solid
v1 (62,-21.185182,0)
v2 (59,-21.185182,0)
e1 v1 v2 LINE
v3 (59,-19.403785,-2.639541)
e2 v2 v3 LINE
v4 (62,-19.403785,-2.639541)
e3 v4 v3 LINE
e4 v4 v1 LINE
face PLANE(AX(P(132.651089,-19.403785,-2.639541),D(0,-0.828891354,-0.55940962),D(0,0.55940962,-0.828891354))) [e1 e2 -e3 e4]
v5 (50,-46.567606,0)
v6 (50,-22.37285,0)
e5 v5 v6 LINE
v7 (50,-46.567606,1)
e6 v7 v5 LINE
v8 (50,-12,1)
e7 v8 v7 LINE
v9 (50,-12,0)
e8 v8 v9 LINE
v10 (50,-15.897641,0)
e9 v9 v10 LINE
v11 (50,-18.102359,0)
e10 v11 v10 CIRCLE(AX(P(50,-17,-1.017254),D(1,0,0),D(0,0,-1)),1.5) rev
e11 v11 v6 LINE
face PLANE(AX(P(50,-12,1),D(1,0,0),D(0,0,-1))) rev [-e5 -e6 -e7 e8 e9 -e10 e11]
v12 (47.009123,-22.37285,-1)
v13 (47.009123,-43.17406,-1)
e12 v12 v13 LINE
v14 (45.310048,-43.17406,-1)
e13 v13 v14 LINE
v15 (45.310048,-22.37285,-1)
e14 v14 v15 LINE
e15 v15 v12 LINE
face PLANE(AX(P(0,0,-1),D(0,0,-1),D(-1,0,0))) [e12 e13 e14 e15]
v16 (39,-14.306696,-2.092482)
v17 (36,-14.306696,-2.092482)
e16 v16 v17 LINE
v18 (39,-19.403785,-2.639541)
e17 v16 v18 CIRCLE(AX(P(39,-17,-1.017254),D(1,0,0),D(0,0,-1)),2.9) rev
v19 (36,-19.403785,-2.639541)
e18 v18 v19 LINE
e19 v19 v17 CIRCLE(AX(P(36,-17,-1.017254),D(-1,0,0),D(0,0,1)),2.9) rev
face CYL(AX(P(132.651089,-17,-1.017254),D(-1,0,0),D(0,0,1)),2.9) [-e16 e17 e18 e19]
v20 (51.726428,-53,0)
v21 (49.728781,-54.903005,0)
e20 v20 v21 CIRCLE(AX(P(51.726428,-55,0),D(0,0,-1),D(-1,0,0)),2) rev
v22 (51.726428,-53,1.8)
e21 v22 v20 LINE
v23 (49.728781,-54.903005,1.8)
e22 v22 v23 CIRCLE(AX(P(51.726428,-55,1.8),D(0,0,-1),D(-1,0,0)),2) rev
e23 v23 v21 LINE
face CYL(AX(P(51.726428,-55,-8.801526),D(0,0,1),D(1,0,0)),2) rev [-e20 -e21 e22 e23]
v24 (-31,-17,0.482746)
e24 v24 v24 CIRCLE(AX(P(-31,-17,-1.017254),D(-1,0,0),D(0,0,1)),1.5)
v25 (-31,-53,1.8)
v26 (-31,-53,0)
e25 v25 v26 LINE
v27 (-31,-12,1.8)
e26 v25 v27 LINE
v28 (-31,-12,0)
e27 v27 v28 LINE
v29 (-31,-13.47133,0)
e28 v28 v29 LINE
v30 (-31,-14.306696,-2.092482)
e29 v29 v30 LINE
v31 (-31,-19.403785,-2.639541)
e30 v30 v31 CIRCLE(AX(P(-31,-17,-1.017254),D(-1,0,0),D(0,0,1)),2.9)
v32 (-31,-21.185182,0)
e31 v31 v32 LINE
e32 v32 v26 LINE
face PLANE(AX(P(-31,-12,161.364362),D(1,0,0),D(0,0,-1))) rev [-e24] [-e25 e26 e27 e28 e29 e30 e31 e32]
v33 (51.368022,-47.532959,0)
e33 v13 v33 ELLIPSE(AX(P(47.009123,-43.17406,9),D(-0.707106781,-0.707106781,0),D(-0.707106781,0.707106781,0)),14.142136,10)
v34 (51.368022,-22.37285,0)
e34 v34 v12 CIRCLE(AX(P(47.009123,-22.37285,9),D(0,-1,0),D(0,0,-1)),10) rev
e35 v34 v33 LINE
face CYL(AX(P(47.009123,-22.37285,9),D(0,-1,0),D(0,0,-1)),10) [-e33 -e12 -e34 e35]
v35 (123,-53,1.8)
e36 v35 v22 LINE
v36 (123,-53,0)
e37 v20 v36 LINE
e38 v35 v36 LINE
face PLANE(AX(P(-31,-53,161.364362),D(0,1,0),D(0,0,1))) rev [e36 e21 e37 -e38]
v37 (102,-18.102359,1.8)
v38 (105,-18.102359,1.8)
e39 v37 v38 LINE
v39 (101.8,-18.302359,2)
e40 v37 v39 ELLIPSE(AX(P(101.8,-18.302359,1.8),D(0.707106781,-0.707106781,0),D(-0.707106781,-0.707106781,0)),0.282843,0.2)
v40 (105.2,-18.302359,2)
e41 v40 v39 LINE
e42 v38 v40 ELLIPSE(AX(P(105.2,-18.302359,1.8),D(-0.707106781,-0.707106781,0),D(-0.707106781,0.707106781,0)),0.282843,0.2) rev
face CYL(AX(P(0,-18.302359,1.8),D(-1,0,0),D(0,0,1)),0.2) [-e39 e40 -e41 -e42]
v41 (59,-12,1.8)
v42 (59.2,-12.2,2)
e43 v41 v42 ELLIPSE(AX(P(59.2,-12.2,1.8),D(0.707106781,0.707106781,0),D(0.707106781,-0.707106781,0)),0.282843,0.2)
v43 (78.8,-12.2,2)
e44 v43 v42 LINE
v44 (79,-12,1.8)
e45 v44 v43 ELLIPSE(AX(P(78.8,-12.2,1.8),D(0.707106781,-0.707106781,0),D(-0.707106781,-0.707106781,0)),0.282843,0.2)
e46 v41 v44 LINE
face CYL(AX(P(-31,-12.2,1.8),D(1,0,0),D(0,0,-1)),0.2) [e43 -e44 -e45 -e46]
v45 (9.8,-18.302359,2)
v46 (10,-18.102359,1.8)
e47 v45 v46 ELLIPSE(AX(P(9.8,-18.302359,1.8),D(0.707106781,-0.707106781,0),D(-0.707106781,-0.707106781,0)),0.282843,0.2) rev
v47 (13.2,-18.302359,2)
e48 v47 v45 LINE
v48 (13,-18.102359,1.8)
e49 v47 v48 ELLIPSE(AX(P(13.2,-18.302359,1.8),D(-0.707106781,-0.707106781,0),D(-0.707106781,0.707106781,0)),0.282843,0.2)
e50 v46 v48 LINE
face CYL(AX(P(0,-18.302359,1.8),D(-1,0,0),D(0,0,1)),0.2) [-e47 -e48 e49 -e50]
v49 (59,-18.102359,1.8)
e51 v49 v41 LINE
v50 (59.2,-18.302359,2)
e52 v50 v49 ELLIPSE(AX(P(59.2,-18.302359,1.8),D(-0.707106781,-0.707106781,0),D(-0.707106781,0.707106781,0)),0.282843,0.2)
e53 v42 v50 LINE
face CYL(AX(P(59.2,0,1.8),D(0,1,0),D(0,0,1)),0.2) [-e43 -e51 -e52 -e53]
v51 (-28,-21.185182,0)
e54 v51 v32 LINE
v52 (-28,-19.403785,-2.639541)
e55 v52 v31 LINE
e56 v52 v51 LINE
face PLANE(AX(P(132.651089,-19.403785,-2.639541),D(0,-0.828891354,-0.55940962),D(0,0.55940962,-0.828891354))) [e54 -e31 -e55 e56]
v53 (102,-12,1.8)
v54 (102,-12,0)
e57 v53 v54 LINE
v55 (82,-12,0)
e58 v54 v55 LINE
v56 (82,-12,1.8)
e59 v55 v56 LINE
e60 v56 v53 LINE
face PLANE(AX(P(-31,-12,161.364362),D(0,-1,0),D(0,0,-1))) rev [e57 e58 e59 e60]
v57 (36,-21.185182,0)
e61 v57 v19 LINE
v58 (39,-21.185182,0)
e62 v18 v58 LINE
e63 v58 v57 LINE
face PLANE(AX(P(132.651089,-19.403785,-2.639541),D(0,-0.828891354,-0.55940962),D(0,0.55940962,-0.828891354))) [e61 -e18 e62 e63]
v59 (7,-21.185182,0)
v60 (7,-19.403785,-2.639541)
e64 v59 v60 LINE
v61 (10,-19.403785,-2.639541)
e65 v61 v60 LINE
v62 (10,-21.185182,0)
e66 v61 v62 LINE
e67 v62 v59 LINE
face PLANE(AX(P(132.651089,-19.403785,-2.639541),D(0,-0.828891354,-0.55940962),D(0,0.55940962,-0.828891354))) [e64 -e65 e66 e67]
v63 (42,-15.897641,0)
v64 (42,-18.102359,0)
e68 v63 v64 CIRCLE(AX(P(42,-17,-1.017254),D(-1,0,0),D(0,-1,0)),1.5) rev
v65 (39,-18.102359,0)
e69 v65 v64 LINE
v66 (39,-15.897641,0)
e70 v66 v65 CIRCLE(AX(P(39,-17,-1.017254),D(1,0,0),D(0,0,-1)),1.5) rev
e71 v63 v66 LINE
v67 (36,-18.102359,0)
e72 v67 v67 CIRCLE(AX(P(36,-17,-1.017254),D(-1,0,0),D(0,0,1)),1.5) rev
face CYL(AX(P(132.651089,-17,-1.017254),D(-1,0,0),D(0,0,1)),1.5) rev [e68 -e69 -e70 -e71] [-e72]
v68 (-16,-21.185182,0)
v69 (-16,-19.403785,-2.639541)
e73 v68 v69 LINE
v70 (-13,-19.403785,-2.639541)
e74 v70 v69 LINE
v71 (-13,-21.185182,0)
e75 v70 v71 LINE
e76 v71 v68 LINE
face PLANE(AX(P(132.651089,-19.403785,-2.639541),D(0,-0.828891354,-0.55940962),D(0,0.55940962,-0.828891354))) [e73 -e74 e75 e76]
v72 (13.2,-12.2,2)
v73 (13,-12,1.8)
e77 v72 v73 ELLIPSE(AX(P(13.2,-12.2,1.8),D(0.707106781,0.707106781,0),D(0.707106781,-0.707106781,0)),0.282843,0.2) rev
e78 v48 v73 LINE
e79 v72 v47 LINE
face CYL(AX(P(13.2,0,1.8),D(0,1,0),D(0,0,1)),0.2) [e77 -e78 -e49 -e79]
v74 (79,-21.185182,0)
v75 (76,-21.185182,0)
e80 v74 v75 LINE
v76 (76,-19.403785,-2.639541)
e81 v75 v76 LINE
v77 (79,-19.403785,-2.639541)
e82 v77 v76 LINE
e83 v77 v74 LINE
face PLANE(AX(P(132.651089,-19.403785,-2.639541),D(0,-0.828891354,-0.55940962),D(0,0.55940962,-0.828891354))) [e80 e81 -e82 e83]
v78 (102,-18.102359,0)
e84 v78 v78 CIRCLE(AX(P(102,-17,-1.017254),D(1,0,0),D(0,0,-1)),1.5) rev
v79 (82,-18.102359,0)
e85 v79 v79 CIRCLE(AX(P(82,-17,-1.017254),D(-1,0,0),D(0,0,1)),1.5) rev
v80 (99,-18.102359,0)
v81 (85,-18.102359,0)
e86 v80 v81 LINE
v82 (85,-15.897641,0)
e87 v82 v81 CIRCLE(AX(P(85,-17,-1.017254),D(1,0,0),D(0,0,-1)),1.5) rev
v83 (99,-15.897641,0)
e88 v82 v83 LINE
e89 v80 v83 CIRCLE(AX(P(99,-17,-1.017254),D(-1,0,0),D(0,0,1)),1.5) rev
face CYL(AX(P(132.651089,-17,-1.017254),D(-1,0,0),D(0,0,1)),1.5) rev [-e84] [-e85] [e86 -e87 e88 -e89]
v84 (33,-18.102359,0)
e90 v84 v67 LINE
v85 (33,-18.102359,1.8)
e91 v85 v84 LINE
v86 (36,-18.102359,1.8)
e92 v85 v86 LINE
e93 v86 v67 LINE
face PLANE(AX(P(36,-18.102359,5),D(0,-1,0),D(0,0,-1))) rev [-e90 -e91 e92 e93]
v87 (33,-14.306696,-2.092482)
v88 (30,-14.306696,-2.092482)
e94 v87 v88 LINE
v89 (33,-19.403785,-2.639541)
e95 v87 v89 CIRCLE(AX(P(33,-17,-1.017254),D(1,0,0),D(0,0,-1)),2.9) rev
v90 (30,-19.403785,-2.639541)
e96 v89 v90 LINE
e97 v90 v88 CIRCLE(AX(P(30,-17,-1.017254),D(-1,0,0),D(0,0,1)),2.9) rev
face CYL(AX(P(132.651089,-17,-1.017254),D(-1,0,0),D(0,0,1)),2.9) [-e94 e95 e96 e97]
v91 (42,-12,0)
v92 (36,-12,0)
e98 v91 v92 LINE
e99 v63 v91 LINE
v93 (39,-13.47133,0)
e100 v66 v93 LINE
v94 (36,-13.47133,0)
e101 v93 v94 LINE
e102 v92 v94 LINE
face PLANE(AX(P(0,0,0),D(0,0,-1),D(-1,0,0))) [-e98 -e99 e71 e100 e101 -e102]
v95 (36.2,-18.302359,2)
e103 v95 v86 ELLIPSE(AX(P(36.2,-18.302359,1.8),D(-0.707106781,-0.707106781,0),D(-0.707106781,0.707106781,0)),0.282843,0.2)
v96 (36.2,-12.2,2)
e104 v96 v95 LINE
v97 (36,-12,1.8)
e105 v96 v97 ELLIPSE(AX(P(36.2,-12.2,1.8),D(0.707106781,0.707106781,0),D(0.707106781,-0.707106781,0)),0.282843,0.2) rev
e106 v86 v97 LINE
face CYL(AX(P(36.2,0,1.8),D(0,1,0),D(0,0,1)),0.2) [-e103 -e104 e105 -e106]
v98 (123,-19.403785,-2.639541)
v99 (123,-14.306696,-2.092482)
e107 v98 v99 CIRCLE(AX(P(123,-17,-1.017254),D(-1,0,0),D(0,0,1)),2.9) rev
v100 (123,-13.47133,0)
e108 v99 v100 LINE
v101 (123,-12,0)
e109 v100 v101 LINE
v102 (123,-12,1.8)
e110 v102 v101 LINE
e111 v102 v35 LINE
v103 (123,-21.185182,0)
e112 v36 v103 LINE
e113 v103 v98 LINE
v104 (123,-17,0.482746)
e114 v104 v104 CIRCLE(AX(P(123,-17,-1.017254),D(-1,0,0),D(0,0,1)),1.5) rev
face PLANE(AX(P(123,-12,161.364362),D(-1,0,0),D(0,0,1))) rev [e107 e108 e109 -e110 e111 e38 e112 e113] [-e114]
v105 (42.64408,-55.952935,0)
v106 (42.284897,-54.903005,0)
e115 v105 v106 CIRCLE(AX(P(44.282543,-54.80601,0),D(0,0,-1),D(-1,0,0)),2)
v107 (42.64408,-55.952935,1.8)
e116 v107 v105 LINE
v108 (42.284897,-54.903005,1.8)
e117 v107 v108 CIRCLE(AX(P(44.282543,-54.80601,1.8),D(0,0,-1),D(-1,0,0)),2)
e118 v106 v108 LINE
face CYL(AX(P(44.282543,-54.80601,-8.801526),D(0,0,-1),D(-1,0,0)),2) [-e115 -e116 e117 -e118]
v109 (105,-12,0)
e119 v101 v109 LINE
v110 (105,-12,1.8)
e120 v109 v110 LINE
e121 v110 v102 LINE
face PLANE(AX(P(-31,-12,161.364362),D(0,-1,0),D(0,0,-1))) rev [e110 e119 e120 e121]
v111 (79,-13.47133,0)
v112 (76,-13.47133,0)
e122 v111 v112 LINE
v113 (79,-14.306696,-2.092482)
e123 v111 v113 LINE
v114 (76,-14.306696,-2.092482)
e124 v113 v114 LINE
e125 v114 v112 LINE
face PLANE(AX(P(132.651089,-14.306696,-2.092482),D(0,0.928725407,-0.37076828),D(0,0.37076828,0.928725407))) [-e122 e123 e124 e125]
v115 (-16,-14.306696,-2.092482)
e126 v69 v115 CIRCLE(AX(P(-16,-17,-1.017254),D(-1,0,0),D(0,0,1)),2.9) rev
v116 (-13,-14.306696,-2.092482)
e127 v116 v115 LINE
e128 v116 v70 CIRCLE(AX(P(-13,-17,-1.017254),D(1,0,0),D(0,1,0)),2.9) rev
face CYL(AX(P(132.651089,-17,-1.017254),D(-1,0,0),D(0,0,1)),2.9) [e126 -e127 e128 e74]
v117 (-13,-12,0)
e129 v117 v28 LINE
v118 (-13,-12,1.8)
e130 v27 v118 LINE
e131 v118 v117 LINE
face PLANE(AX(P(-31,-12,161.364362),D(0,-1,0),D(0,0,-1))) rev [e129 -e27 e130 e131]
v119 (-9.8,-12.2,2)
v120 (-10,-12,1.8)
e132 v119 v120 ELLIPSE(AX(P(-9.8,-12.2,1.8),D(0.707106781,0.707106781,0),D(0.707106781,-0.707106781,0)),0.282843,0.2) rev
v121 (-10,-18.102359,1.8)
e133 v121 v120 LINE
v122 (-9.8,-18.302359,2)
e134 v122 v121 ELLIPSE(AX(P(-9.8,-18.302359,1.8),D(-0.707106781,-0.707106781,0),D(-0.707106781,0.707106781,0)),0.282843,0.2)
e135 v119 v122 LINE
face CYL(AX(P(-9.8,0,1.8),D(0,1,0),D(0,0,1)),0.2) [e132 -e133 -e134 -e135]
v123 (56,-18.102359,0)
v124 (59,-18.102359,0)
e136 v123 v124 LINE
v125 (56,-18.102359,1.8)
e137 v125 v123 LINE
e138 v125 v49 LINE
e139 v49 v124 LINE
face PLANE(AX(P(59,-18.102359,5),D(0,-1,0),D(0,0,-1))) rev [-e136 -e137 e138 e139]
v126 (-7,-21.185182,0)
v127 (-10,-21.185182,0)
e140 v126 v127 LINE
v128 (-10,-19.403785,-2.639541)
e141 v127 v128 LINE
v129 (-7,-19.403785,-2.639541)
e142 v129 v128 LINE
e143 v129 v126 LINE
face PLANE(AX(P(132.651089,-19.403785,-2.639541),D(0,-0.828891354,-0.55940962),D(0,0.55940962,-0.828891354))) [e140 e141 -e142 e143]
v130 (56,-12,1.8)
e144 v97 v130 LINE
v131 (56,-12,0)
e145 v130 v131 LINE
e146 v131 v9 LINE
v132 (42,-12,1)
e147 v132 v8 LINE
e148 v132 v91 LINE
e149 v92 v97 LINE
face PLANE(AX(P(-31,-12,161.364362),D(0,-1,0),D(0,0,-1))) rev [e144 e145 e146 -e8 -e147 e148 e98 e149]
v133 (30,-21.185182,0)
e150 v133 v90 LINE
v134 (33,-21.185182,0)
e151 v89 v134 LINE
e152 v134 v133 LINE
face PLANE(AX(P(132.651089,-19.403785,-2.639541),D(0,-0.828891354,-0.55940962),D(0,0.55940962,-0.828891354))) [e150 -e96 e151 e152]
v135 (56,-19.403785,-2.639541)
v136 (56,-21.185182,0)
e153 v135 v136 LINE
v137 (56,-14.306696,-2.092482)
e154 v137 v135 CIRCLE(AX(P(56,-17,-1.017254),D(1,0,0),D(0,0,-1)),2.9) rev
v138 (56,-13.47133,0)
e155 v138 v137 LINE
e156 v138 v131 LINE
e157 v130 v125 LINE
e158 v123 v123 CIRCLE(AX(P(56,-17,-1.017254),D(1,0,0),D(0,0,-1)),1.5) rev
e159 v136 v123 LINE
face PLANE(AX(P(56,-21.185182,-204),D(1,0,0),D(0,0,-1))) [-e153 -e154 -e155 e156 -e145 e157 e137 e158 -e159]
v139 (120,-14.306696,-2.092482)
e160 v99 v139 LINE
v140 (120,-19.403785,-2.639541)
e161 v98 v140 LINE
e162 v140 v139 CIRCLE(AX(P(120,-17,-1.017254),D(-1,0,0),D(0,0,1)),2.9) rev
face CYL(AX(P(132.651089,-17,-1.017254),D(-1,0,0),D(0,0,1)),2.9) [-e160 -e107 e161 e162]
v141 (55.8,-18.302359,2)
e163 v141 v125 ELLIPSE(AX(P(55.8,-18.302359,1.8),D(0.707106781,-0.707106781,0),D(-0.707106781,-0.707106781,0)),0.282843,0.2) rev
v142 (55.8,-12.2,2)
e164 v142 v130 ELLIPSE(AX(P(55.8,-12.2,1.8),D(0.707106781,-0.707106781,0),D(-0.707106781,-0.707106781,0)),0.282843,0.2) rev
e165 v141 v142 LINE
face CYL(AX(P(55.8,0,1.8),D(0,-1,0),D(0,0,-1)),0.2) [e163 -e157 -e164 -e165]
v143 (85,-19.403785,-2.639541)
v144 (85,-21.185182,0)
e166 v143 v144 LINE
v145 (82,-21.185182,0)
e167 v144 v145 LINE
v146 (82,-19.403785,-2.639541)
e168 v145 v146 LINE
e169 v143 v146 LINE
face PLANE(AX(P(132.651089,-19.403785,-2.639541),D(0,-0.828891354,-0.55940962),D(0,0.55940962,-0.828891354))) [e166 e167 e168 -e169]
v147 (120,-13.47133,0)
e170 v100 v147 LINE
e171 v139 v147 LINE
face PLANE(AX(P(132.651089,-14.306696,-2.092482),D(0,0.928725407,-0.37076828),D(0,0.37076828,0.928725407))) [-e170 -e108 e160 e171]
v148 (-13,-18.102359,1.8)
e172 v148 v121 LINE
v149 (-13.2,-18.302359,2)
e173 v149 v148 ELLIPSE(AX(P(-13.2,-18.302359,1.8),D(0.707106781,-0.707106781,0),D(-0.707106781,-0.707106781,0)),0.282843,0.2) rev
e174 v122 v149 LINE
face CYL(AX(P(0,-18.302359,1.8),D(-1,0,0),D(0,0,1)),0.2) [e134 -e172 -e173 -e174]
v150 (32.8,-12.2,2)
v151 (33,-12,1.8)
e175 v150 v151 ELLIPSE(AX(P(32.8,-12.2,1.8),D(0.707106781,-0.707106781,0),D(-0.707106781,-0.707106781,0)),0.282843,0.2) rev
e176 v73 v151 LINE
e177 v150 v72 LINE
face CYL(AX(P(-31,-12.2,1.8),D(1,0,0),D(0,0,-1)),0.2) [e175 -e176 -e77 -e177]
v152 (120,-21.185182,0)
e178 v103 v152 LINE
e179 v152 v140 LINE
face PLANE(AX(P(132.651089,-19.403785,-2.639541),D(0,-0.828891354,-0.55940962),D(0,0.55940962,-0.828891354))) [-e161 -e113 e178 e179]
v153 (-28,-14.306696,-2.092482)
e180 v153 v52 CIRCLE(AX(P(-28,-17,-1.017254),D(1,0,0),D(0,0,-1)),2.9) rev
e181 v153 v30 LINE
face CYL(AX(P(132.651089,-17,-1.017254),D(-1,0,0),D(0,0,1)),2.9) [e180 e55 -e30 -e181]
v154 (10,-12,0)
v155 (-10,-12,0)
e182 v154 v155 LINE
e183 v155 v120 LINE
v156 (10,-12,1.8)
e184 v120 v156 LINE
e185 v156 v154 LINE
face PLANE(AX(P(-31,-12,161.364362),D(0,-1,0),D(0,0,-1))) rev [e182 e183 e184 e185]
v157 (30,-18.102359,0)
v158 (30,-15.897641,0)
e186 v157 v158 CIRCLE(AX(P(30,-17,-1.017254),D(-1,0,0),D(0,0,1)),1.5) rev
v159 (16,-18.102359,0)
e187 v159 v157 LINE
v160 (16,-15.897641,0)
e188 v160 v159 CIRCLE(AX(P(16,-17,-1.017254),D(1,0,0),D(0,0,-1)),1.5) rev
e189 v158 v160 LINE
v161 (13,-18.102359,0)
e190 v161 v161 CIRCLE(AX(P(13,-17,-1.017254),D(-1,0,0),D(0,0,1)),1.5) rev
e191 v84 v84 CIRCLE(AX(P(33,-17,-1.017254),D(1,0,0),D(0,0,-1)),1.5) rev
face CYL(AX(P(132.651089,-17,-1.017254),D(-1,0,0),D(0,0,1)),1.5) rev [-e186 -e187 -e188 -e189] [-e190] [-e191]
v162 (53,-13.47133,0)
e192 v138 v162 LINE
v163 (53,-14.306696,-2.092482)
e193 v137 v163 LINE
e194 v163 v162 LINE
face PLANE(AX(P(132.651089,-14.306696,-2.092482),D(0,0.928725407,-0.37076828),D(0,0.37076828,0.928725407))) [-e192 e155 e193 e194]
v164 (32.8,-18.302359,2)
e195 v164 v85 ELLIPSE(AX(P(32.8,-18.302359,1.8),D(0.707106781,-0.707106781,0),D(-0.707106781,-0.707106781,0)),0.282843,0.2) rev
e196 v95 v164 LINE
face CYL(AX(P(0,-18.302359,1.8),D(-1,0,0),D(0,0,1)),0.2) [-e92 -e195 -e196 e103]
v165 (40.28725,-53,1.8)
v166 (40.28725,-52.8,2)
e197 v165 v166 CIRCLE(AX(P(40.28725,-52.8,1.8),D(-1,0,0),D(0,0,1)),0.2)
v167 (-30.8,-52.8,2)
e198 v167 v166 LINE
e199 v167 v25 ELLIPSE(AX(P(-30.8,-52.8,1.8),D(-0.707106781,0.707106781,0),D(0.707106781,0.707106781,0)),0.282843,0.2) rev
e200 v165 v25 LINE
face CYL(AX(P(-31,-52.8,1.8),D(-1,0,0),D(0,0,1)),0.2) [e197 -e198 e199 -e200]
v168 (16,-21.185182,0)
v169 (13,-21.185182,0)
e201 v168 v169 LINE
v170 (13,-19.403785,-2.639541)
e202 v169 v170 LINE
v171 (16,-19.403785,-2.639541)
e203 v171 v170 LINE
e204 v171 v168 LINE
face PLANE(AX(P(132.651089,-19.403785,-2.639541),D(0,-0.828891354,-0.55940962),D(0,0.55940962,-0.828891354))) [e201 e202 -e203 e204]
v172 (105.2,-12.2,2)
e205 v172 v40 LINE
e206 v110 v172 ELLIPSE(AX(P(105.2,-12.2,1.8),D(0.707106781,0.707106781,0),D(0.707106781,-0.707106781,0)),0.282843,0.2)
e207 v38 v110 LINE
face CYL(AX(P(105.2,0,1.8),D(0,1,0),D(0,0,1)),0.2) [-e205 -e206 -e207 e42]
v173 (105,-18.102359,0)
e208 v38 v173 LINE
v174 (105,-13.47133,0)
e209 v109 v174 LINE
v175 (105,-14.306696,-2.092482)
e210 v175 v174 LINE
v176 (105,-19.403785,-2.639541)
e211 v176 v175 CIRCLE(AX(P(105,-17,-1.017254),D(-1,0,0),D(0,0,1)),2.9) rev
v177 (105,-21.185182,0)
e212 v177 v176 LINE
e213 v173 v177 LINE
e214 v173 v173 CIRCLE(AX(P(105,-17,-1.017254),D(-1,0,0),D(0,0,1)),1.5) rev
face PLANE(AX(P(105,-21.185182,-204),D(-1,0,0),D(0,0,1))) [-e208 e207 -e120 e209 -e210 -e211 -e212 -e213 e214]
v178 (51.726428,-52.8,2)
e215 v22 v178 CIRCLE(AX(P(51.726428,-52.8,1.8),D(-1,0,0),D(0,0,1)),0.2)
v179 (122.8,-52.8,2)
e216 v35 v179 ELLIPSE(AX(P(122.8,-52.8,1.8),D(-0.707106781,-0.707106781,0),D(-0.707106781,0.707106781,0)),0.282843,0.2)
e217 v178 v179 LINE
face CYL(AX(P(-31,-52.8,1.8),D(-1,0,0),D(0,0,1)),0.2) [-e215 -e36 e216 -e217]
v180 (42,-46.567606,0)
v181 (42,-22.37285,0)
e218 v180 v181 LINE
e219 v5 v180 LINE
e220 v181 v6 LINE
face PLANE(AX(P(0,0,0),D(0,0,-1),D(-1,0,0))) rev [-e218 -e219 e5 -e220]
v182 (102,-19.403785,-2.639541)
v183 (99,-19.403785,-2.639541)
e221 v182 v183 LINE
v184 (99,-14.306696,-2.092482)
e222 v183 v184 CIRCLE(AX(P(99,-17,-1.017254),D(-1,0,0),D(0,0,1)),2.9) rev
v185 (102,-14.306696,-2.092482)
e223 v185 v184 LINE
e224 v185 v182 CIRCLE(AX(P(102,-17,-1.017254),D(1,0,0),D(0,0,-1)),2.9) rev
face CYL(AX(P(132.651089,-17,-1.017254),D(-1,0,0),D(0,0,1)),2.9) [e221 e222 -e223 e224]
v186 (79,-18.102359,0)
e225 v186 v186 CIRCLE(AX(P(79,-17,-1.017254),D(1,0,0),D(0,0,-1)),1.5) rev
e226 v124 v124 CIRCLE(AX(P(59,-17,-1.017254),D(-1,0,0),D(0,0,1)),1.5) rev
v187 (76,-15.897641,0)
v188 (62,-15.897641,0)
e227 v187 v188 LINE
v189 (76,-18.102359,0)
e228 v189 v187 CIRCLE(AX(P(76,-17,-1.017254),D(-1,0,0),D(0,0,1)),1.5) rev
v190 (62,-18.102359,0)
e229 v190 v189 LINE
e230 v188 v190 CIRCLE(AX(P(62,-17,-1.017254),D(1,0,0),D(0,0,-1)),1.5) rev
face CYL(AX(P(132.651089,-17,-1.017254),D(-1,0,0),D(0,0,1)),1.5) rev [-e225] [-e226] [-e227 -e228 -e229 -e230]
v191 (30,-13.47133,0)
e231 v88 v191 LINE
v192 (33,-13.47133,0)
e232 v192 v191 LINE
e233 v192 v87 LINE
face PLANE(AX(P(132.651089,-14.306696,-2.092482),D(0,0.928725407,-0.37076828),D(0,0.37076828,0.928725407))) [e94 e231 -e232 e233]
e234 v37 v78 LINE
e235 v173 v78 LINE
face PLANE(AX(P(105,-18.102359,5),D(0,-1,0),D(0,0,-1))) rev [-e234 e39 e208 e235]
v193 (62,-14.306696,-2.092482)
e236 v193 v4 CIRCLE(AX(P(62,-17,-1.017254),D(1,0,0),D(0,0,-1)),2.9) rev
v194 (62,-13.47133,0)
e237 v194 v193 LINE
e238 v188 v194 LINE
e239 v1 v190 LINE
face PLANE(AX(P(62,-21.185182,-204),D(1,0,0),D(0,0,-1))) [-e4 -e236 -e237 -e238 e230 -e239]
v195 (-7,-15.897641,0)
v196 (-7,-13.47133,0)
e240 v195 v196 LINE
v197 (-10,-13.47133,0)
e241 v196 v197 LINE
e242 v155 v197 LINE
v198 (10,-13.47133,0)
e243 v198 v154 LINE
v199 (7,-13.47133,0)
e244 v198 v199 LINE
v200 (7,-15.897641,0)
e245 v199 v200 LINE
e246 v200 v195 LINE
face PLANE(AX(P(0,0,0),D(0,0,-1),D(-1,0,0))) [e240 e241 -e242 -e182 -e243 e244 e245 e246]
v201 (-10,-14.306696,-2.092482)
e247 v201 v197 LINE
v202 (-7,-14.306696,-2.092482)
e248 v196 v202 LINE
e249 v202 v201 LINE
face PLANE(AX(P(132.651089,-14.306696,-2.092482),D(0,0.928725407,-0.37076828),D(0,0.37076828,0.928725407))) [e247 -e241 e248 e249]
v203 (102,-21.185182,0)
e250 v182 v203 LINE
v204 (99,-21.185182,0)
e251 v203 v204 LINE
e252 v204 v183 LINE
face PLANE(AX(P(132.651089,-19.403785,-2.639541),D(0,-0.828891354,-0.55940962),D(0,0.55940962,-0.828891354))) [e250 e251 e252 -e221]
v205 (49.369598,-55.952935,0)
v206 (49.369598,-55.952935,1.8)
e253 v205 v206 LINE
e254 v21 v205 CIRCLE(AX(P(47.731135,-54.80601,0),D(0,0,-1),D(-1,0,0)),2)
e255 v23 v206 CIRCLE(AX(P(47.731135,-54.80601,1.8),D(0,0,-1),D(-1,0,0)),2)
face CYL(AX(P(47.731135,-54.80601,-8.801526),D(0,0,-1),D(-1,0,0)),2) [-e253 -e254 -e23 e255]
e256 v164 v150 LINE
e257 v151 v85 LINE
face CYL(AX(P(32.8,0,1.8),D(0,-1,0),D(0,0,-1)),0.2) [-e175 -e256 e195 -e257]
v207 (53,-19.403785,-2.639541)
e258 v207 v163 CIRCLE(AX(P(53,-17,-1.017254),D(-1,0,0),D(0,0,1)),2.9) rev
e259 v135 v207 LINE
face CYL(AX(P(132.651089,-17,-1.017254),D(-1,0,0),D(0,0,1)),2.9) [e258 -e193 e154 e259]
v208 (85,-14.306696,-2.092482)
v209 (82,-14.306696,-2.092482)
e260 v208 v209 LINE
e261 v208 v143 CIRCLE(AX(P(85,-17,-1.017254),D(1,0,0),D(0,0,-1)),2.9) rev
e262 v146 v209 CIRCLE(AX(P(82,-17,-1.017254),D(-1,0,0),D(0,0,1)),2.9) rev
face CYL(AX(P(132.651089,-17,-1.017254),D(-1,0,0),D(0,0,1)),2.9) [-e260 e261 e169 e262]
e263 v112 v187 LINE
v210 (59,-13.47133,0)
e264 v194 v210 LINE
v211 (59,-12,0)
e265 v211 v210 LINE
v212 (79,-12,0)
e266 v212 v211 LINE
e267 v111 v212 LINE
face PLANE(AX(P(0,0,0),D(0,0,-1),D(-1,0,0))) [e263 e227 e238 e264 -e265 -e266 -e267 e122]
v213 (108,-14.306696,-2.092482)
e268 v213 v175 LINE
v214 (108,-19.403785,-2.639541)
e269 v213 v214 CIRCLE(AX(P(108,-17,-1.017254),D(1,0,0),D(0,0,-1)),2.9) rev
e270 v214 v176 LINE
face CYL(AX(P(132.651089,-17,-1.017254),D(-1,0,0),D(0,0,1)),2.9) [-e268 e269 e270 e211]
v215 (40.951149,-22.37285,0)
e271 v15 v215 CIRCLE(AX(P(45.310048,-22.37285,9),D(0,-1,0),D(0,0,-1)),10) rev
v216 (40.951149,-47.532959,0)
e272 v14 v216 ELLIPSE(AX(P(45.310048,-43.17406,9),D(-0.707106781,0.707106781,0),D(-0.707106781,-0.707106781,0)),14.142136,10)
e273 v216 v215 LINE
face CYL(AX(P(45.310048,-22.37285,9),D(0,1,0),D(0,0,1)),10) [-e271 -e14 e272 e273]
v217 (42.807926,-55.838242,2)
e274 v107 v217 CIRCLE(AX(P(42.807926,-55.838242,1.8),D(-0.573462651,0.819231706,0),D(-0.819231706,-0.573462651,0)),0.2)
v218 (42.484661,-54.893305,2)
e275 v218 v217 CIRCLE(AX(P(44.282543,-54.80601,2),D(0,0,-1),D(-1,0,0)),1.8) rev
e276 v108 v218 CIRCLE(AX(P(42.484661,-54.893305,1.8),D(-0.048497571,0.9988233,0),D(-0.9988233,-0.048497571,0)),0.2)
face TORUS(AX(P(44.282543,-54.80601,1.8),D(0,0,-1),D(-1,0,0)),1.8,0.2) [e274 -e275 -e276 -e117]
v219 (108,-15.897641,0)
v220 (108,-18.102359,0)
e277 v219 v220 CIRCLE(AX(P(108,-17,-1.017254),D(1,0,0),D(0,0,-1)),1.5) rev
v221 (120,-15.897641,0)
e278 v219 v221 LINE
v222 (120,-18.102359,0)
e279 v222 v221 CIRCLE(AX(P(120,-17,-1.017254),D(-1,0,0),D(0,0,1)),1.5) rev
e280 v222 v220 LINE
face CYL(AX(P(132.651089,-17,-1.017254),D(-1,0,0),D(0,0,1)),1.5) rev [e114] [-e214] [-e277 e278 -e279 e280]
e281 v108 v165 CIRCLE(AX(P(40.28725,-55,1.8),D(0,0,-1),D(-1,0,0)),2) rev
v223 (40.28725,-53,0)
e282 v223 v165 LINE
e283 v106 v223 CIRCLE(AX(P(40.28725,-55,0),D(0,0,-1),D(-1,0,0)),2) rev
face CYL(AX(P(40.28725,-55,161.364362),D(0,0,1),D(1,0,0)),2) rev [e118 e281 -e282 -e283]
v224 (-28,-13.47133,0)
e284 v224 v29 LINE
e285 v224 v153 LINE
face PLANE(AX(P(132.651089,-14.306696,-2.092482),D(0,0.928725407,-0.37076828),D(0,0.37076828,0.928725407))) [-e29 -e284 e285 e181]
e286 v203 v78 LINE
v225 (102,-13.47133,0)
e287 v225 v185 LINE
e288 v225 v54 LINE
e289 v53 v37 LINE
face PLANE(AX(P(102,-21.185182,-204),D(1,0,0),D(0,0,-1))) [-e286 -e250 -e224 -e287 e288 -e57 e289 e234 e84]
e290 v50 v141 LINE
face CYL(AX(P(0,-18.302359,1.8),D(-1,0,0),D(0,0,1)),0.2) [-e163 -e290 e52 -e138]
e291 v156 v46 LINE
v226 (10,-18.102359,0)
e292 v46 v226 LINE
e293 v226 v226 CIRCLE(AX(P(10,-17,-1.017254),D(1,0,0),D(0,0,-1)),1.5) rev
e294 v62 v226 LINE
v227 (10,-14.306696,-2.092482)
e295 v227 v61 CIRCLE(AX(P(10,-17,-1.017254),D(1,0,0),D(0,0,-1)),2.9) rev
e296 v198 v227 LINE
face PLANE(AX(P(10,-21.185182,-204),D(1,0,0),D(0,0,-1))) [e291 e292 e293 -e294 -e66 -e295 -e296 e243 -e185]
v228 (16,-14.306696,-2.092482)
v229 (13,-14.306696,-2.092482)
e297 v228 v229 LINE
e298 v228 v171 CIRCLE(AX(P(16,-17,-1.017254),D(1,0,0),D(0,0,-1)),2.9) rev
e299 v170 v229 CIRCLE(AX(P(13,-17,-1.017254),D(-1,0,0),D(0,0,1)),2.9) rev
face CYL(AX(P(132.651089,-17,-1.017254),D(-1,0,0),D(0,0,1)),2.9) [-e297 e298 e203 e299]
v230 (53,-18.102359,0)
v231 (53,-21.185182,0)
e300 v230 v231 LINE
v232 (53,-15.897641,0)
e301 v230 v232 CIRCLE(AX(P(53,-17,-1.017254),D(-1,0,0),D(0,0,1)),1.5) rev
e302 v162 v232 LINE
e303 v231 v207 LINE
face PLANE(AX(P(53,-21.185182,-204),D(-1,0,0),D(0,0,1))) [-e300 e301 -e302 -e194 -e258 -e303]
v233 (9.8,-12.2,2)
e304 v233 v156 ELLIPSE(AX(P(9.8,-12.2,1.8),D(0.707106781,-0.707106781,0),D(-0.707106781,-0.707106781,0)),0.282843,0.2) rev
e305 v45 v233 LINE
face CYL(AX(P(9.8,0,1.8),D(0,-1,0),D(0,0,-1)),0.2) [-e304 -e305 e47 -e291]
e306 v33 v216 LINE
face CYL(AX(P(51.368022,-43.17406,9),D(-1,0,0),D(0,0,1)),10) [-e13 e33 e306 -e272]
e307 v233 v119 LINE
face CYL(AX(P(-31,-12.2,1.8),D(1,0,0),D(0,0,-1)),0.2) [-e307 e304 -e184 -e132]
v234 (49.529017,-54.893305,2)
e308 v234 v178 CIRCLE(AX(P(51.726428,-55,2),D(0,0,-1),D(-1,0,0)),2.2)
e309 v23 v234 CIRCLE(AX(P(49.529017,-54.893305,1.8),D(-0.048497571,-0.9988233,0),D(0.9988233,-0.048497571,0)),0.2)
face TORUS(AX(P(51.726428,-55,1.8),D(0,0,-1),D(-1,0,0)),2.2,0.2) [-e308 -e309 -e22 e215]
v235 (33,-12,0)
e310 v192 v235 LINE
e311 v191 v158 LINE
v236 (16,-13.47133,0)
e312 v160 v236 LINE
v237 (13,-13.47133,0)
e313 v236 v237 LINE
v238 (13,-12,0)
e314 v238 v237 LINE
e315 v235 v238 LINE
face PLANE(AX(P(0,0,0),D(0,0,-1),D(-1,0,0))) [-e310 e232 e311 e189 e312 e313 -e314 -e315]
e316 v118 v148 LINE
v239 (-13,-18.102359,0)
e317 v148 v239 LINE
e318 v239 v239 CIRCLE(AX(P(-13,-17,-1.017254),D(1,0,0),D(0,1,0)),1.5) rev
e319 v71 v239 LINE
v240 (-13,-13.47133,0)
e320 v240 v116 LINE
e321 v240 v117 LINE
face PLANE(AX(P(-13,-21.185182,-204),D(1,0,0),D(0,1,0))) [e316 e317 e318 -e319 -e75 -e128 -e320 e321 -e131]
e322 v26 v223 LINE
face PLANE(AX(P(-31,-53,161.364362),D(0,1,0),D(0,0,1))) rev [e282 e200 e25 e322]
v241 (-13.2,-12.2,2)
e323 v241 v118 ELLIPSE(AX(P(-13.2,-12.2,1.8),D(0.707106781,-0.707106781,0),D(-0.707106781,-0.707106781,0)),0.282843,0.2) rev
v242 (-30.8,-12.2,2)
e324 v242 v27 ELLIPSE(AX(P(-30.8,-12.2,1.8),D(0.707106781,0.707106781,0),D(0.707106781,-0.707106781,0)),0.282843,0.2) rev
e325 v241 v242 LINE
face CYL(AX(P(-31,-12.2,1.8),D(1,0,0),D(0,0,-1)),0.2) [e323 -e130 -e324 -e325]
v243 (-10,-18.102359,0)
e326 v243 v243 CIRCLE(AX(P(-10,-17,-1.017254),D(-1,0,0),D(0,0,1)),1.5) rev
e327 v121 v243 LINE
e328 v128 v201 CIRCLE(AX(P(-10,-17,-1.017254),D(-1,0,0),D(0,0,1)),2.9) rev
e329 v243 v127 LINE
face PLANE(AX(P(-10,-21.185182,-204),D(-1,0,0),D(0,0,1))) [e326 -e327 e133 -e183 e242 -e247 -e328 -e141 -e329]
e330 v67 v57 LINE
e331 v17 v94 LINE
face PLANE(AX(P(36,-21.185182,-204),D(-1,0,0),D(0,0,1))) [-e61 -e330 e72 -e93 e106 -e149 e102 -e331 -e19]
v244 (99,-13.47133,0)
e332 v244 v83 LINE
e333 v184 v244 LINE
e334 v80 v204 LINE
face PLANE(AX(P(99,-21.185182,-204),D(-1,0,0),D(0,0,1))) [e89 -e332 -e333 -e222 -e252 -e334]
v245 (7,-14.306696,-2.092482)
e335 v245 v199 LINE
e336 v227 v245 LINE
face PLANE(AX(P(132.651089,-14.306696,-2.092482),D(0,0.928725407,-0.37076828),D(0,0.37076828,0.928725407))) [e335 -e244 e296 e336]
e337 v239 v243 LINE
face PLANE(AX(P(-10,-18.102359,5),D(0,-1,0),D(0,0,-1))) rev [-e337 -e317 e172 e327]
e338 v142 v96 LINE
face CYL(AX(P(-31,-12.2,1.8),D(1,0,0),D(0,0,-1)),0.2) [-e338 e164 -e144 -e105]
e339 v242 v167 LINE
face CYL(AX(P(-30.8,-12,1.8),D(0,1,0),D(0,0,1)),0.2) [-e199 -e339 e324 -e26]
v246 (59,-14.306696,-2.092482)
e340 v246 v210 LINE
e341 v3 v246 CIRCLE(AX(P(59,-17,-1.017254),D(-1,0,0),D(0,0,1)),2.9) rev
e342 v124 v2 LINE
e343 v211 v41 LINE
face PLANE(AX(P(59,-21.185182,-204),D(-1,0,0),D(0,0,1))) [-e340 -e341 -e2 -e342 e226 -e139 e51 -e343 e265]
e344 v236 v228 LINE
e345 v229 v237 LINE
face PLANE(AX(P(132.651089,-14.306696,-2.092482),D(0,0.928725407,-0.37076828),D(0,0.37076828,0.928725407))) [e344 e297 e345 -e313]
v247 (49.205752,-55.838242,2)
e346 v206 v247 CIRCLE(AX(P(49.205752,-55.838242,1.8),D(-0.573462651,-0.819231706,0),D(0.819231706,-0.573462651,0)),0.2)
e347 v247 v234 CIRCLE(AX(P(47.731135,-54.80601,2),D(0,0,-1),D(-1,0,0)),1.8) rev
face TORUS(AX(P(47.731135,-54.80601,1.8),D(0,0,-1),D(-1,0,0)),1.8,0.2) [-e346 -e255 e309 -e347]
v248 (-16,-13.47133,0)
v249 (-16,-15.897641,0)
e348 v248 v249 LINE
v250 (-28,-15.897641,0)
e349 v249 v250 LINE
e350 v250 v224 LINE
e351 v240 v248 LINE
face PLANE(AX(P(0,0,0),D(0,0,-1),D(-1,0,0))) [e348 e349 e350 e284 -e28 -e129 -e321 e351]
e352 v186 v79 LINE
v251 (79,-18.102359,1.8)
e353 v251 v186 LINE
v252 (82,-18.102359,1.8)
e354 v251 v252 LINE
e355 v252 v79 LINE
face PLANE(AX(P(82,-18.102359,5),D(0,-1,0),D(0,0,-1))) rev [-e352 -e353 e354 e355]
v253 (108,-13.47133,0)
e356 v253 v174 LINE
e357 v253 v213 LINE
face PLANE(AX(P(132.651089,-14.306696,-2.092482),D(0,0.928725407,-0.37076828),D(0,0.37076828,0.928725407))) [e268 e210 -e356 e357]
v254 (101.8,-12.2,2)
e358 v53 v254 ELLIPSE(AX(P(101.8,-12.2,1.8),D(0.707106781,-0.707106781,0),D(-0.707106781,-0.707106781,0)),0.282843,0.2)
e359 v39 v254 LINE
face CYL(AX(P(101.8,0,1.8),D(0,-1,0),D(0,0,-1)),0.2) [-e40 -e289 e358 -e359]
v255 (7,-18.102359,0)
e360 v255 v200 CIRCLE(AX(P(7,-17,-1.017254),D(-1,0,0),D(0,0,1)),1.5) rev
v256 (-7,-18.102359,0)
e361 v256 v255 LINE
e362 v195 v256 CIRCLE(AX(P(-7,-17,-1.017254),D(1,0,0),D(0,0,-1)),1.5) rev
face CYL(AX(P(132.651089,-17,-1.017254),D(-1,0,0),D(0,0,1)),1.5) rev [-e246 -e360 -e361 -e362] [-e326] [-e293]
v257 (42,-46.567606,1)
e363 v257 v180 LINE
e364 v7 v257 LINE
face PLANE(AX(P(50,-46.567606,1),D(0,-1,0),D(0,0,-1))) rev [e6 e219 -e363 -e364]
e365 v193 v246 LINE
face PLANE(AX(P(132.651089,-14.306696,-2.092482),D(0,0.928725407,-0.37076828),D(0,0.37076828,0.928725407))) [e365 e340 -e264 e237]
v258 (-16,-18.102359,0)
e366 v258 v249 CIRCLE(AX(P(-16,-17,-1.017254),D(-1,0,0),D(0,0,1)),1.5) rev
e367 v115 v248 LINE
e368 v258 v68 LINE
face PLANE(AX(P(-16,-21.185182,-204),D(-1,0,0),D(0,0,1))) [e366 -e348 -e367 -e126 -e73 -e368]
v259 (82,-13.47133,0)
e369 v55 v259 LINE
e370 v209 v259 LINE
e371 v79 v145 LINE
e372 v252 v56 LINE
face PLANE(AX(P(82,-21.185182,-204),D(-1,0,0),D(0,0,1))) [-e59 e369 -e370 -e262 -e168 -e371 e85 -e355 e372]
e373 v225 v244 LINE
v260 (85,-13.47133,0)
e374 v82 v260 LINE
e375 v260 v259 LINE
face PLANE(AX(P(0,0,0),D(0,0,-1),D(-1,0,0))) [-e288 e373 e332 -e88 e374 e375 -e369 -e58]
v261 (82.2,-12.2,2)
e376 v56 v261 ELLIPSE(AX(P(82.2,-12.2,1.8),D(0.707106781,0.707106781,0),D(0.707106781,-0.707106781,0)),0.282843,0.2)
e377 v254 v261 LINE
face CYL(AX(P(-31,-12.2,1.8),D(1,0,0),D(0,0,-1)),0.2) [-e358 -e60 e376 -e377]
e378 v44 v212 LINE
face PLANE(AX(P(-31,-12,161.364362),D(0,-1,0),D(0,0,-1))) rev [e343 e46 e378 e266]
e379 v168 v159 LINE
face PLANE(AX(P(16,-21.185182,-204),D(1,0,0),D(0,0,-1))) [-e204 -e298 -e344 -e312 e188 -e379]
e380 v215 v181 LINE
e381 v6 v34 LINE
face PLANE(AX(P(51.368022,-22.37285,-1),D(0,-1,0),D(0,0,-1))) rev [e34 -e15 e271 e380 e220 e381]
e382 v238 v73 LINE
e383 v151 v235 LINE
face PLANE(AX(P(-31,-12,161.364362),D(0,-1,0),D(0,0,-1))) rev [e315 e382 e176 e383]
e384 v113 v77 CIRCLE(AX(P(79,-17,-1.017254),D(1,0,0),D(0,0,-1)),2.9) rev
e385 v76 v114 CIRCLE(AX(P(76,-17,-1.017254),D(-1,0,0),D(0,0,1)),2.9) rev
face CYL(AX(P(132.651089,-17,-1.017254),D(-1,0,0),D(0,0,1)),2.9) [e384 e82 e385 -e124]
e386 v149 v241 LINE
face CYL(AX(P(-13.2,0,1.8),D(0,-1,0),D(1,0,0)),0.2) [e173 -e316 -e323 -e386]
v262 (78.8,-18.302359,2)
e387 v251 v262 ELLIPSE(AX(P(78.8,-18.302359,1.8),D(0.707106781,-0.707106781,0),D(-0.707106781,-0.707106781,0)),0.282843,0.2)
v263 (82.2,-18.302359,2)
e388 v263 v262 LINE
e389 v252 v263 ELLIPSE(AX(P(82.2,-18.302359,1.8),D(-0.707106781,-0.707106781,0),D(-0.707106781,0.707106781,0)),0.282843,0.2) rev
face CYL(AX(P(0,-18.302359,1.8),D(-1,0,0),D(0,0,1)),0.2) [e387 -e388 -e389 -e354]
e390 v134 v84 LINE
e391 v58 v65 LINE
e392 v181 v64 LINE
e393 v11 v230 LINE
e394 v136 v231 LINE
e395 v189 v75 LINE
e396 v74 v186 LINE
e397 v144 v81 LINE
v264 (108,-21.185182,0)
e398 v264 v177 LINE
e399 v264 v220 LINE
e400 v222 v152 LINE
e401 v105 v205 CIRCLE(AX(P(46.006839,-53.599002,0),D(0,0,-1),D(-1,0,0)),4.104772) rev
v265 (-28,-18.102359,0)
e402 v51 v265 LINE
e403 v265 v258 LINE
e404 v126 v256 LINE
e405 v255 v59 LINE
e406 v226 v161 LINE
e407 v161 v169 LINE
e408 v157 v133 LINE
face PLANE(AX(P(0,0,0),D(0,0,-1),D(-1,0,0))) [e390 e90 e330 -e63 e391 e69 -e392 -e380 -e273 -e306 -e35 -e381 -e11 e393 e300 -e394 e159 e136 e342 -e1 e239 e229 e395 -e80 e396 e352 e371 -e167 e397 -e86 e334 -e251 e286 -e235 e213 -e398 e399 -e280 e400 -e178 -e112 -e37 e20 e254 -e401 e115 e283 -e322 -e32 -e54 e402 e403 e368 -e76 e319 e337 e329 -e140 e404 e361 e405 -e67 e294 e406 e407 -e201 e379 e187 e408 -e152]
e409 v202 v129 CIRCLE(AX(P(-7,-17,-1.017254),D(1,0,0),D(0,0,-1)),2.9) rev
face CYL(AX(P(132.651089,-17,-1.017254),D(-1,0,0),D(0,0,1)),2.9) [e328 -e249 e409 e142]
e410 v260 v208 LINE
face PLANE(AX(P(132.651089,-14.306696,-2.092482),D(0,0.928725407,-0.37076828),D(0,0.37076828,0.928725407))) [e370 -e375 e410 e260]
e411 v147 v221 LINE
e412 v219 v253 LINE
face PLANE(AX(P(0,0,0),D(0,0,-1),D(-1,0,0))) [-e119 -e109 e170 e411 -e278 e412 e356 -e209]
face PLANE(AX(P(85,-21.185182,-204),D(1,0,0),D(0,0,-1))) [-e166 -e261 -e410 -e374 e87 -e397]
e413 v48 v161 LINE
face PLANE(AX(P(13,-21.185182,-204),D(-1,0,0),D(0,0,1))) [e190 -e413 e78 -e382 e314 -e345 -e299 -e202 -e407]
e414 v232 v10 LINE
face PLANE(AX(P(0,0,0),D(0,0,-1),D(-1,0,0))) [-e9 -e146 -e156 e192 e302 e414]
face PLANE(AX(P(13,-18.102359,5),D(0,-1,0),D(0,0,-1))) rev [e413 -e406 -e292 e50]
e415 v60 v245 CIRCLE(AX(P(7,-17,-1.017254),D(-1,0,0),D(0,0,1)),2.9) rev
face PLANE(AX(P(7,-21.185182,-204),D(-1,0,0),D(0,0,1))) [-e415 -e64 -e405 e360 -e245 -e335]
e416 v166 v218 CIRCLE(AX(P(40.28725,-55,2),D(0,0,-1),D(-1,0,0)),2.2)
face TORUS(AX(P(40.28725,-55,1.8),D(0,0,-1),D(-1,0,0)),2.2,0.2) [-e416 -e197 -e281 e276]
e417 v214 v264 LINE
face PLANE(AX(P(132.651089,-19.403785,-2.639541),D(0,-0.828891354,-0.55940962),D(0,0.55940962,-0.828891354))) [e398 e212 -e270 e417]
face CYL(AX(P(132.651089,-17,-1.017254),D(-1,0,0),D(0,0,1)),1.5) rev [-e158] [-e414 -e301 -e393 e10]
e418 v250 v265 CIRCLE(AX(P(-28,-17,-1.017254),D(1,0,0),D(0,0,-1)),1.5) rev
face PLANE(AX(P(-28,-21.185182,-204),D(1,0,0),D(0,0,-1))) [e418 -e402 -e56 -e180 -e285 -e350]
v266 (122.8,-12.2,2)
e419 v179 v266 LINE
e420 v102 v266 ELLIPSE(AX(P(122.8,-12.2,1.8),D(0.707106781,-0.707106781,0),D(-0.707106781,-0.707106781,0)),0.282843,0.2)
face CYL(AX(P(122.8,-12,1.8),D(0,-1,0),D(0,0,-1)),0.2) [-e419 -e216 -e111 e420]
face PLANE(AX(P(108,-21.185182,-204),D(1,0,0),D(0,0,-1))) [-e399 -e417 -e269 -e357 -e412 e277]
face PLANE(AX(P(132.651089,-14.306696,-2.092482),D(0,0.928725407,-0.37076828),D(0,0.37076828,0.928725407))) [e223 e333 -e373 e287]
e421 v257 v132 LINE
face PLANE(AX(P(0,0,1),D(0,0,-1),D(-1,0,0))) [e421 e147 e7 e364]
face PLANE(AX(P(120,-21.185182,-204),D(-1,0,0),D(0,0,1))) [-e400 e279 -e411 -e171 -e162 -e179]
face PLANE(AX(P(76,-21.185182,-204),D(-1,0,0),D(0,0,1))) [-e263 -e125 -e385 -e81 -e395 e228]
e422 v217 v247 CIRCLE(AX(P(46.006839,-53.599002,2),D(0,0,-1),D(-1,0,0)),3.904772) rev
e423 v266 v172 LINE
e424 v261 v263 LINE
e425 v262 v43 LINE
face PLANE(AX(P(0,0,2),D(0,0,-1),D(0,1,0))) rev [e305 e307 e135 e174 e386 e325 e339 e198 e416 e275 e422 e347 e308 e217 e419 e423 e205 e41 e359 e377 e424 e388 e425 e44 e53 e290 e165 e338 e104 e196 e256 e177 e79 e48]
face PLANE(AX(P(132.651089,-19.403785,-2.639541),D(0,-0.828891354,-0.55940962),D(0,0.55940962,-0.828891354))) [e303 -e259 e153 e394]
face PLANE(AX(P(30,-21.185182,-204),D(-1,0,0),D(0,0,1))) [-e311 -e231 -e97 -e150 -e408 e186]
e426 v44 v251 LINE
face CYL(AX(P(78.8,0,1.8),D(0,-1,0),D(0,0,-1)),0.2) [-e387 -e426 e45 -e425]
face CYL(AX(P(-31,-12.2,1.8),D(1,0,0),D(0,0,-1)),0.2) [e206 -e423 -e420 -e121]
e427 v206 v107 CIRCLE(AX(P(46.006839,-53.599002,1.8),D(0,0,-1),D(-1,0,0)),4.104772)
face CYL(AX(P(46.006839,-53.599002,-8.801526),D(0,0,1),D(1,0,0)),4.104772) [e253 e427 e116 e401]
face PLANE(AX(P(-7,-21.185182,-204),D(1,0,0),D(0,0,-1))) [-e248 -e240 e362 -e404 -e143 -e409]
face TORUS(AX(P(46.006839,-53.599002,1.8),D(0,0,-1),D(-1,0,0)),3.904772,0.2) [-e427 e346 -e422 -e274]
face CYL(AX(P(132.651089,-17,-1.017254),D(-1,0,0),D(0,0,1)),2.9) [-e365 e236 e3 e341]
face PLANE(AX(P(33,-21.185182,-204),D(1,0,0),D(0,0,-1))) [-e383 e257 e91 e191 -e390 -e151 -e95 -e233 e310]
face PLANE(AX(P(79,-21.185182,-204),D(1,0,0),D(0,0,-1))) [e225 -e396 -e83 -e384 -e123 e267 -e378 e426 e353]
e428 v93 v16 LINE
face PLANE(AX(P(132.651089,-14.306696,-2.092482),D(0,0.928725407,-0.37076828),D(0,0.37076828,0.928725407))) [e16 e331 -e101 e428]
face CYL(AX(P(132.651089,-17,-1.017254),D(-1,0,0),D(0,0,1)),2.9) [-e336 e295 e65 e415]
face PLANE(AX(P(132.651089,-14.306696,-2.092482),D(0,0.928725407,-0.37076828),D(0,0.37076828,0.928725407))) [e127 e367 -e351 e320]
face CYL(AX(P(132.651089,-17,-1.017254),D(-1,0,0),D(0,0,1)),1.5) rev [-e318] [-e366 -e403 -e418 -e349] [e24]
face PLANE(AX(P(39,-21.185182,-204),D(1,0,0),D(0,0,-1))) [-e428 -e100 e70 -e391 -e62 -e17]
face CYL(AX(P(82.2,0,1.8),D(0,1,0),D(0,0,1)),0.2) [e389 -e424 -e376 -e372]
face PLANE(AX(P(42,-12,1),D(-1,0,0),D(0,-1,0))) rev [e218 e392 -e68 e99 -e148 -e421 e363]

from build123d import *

# Parameters (mm, degrees)
SKETCH1_W           = 154
SKETCH1_H           = 41
BOSS_EXTRUDE1_DEPTH = 2
SKETCH2_R           = 1.5
CUT_EXTRUDE1_DEPTH  = 204
SKETCH3_R           = 1.5
BOSS_EXTRUDE2_DEPTH = 154
SKETCH4_W           = 12
SKETCH4_H           = 23.161381141
SKETCH4_W_2         = 3
SKETCH4_H_2         = 18.642875374
SKETCH4_H_3         = 14.783247827
SKETCH4_W_3         = 14
SKETCH4_H_4         = 17.598544921
SKETCH4_H_5         = 27.804183012
CUT_EXTRUDE2_DEPTH  = 204
SKETCH5_W           = 3
SKETCH5_H           = 13.316127407
CUT_EXTRUDE3_DEPTH  = 5
SKETCH6_W           = 8
SKETCH6_H           = 34.567606234
CUT_EXTRUDE4_DEPTH  = 1
SKETCH7_W           = 10.416873331
SKETCH7_H           = 25.160109374
BOSS_EXTRUDE3_DEPTH = 1
FILLET1_R           = 10
BOSS_EXTRUDE4_DEPTH = 2
FILLET2_R           = 2
FILLET3_R           = 2
FILLET4_R           = 0.2


with BuildPart() as part:
    # Sketch1 → Boss-Extrude1 (new body)
    with BuildSketch(Plane.XY):
        with Locations((46, -32.5)):
            Rectangle(SKETCH1_W, SKETCH1_H)
    extrude(amount=BOSS_EXTRUDE1_DEPTH)

    # Sketch2 → Cut-Extrude1 (cut)
    with BuildSketch(Plane.ZY.offset(31)):
        with Locations((-1, -17)):
            Circle(SKETCH2_R)
    extrude(amount=-CUT_EXTRUDE1_DEPTH, mode=Mode.SUBTRACT)

    # Sketch3 → Boss-Extrude2 (add)
    with BuildSketch(Plane.ZY.offset(31)):
        with BuildLine():
            Line((-2.639541446, -19.403784927), (0, -21.185182296))
            Line((0, -21.185182296), (0, -19.715731065))
            ThreePointArc((0, -19.715731065), (1.882746452, -17), (0, -14.284268935))
            Line((0, -14.284268935), (0, -13.471330145))
            Line((0, -13.471330145), (-2.092481561, -14.306696319))
            ThreePointArc((-2.092481561, -14.306696319), (-3.900693524, -16.690526404), (-2.639541446, -19.403784927))
        make_face()
        with Locations((-1.017253548, -17)):
            Circle(SKETCH3_R, mode=Mode.SUBTRACT)
    extrude(amount=-BOSS_EXTRUDE2_DEPTH)

    # Sketch4 → Cut-Extrude2 (cut)
    with BuildSketch(Plane(origin=(0, 0, 0), x_dir=(-1, 0, 0), z_dir=(0, 0, -1))):
        with Locations((22, -9.604491726)):
            Rectangle(SKETCH4_W, SKETCH4_H)
        with Locations((-80.5, -11.863744609)):
            Rectangle(SKETCH4_W_2, SKETCH4_H_2)
        with Locations((-114, -13.793558383)):
            Rectangle(SKETCH4_W, SKETCH4_H_3)
        with Locations((-103.5, -11.863744609)):
            Rectangle(SKETCH4_W_2, SKETCH4_H_2)
        with Locations((-92, -12.385909835)):
            Rectangle(SKETCH4_W_3, SKETCH4_H_4)
        with Locations((-69, -12.385909835)):
            Rectangle(SKETCH4_W_3, SKETCH4_H_4)
        with Locations((-57.5, -11.863744609)):
            Rectangle(SKETCH4_W_2, SKETCH4_H_2)
        with Locations((-46, -12.385909835)):
            Rectangle(SKETCH4_W_3, SKETCH4_H_4)
        with Locations((-34.5, -11.863744609)):
            Rectangle(SKETCH4_W_2, SKETCH4_H_2)
        with Locations((-23, -12.385909835)):
            Rectangle(SKETCH4_W_3, SKETCH4_H_4)
        with Locations((-11.5, -11.863744609)):
            Rectangle(SKETCH4_W_2, SKETCH4_H_2)
        with Locations((0, -12.385909835)):
            Rectangle(SKETCH4_W_3, SKETCH4_H_4)
        with Locations((11.5, -7.28309079)):
            Rectangle(SKETCH4_W_2, SKETCH4_H_5)
    extrude(amount=CUT_EXTRUDE2_DEPTH, mode=Mode.SUBTRACT)

    # Sketch5 → Cut-Extrude3 (cut)
    with BuildSketch(Plane(origin=(0, 0, 0), x_dir=(-1, 0, 0), z_dir=(0, 0, -1))):
        with Locations((-80.5, -11.44429523)):
            Rectangle(SKETCH5_W, SKETCH5_H)
        with Locations((-103.5, -11.44429523)):
            Rectangle(SKETCH5_W, SKETCH5_H)
        with Locations((-57.5, -11.44429523)):
            Rectangle(SKETCH5_W, SKETCH5_H)
        with Locations((-34.5, -11.44429523)):
            Rectangle(SKETCH5_W, SKETCH5_H)
        with Locations((-11.5, -11.44429523)):
            Rectangle(SKETCH5_W, SKETCH5_H)
        with Locations((11.5, -11.44429523)):
            Rectangle(SKETCH5_W, SKETCH5_H)
    extrude(amount=-CUT_EXTRUDE3_DEPTH, mode=Mode.SUBTRACT)

    # Sketch6 → Cut-Extrude4 (cut)
    with BuildSketch(Plane(origin=(0, 0, 0), x_dir=(-1, 0, 0), z_dir=(0, 0, -1))):
        with Locations((-46, -29.283803117)):
            Rectangle(SKETCH6_W, SKETCH6_H)
    extrude(amount=-CUT_EXTRUDE4_DEPTH, mode=Mode.SUBTRACT)

    # Sketch7 → Boss-Extrude3 (add)
    with BuildSketch(Plane(origin=(0, 0, 0), x_dir=(-1, 0, 0), z_dir=(0, 0, -1))):
        with Locations((-46.159585617, -34.952904223)):
            Rectangle(SKETCH7_W, SKETCH7_H)
    extrude(amount=BOSS_EXTRUDE3_DEPTH)

    # Fillet1
    # the kernel refuses this fillet: 10 mm, written as the material it takes off along each edge
    with BuildSketch(Plane(origin=(40.951148952, -11.475602177, -1), x_dir=(0, 0, 1), z_dir=(0, -1, 0)), Plane(origin=(51.368022283, -58.430206269, -1), x_dir=(0, 0, 1), z_dir=(0, 1, 0))) as fillet1_piece_1:
        with BuildLine():
            CenterArc((10, -4.358898944), FILLET1_R, 154.158067237, 25.841932763)
            Line((0, -4.358898944), (-0.2, -4.358898944))
            Line((-0.2, -4.358898944), (-0.2, 0))
            Line((-0.2, 0), (0, 0.2))
            ThreePointArc((0, 0.2), (0.5, 0.2), (0.82, 0.087177979))
            Line((0.82, 0.087177979), (1, 0))
        make_face()
    extrude(amount=46.954604092, mode=Mode.SUBTRACT)
    with BuildSketch(Plane(origin=(30.053901593, -47.53295891, -1), x_dir=(0, 0, 1), z_dir=(1, 0, 0))) as fillet1_piece_2:
        with BuildLine():
            CenterArc((10, -4.358898944), FILLET1_R, 154.158067237, 25.841932763)
            Line((0, -4.358898944), (-0.2, -4.358898944))
            Line((-0.2, -4.358898944), (-0.2, 0))
            Line((-0.2, 0), (0, 0.2))
            ThreePointArc((0, 0.2), (0.5, 0.2), (0.82, 0.087177979))
            Line((0.82, 0.087177979), (1, 0))
        make_face()
    extrude(amount=32.211368048, mode=Mode.SUBTRACT)

    # Sketch8 → Boss-Extrude4 (add)
    with BuildSketch(Plane.XY.offset(2)):
        with BuildLine():
            Line((42.287250182, -53), (49.726428085, -53))
            Line((49.726428085, -53), (49.726428085, -55.335034312))
            ThreePointArc((49.726428085, -55.335034312), (46.006839134, -57.703773476), (42.287250182, -55.335034312))
            Line((42.287250182, -55.335034312), (42.287250182, -53))
        make_face()
    extrude(amount=-BOSS_EXTRUDE4_DEPTH)

    # Fillet2
    fillet2_edges = [part.edges().sort_by_distance(p)[0] for p in [
        (49.726428085, -53, 1),
        (42.287250182, -53, 1),
    ]]
    fillet(fillet2_edges, radius=FILLET2_R)

    # Fillet3
    fillet3_edges = [part.edges().sort_by_distance(p)[0] for p in [
        (42.287250182, -55.335034312, 1),
        (49.726428085, -55.335034312, 1),
    ]]
    fillet(fillet3_edges, radius=FILLET3_R)

    # Fillet4
    fillet4_edges = [part.edges().sort_by_distance(p)[0] for p in [
        (123, -32.5, 2),
        (87.363214043, -53, 2),
        (-31, -32.5, 2),
        (-22, -12, 2),
        (0, -12, 2),
        (23, -12, 2),
        (46, -12, 2),
        (69, -12, 2),
        (92, -12, 2),
        (114, -12, 2),
        (-13, -15.051179467, 2),
        (-11.5, -18.102358934, 2),
        (-10, -15.051179467, 2),
        (10, -15.051179467, 2),
        (11.5, -18.102358934, 2),
        (13, -15.051179467, 2),
        (33, -15.051179467, 2),
        (34.5, -18.102358934, 2),
        (36, -15.051179467, 2),
        (56, -15.051179467, 2),
        (57.5, -18.102358934, 2),
        (59, -15.051179467, 2),
        (79, -15.051179467, 2),
        (80.5, -18.102358934, 2),
        (82, -15.051179467, 2),
        (103.5, -18.102358934, 2),
        (102, -15.051179467, 2),
        (105, -15.051179467, 2),
        (4.643625091, -53, 2),
        (41.666744603, -53.551899471, 2),
        (46.006839134, -57.703773476, 2),
        (50.346933665, -53.551899471, 2),
        (49.623464755, -55.453379515, 2),
        (42.390213513, -55.453379515, 2),
    ]]
    fillet(fillet4_edges, radius=FILLET4_R)


solid = part.part
